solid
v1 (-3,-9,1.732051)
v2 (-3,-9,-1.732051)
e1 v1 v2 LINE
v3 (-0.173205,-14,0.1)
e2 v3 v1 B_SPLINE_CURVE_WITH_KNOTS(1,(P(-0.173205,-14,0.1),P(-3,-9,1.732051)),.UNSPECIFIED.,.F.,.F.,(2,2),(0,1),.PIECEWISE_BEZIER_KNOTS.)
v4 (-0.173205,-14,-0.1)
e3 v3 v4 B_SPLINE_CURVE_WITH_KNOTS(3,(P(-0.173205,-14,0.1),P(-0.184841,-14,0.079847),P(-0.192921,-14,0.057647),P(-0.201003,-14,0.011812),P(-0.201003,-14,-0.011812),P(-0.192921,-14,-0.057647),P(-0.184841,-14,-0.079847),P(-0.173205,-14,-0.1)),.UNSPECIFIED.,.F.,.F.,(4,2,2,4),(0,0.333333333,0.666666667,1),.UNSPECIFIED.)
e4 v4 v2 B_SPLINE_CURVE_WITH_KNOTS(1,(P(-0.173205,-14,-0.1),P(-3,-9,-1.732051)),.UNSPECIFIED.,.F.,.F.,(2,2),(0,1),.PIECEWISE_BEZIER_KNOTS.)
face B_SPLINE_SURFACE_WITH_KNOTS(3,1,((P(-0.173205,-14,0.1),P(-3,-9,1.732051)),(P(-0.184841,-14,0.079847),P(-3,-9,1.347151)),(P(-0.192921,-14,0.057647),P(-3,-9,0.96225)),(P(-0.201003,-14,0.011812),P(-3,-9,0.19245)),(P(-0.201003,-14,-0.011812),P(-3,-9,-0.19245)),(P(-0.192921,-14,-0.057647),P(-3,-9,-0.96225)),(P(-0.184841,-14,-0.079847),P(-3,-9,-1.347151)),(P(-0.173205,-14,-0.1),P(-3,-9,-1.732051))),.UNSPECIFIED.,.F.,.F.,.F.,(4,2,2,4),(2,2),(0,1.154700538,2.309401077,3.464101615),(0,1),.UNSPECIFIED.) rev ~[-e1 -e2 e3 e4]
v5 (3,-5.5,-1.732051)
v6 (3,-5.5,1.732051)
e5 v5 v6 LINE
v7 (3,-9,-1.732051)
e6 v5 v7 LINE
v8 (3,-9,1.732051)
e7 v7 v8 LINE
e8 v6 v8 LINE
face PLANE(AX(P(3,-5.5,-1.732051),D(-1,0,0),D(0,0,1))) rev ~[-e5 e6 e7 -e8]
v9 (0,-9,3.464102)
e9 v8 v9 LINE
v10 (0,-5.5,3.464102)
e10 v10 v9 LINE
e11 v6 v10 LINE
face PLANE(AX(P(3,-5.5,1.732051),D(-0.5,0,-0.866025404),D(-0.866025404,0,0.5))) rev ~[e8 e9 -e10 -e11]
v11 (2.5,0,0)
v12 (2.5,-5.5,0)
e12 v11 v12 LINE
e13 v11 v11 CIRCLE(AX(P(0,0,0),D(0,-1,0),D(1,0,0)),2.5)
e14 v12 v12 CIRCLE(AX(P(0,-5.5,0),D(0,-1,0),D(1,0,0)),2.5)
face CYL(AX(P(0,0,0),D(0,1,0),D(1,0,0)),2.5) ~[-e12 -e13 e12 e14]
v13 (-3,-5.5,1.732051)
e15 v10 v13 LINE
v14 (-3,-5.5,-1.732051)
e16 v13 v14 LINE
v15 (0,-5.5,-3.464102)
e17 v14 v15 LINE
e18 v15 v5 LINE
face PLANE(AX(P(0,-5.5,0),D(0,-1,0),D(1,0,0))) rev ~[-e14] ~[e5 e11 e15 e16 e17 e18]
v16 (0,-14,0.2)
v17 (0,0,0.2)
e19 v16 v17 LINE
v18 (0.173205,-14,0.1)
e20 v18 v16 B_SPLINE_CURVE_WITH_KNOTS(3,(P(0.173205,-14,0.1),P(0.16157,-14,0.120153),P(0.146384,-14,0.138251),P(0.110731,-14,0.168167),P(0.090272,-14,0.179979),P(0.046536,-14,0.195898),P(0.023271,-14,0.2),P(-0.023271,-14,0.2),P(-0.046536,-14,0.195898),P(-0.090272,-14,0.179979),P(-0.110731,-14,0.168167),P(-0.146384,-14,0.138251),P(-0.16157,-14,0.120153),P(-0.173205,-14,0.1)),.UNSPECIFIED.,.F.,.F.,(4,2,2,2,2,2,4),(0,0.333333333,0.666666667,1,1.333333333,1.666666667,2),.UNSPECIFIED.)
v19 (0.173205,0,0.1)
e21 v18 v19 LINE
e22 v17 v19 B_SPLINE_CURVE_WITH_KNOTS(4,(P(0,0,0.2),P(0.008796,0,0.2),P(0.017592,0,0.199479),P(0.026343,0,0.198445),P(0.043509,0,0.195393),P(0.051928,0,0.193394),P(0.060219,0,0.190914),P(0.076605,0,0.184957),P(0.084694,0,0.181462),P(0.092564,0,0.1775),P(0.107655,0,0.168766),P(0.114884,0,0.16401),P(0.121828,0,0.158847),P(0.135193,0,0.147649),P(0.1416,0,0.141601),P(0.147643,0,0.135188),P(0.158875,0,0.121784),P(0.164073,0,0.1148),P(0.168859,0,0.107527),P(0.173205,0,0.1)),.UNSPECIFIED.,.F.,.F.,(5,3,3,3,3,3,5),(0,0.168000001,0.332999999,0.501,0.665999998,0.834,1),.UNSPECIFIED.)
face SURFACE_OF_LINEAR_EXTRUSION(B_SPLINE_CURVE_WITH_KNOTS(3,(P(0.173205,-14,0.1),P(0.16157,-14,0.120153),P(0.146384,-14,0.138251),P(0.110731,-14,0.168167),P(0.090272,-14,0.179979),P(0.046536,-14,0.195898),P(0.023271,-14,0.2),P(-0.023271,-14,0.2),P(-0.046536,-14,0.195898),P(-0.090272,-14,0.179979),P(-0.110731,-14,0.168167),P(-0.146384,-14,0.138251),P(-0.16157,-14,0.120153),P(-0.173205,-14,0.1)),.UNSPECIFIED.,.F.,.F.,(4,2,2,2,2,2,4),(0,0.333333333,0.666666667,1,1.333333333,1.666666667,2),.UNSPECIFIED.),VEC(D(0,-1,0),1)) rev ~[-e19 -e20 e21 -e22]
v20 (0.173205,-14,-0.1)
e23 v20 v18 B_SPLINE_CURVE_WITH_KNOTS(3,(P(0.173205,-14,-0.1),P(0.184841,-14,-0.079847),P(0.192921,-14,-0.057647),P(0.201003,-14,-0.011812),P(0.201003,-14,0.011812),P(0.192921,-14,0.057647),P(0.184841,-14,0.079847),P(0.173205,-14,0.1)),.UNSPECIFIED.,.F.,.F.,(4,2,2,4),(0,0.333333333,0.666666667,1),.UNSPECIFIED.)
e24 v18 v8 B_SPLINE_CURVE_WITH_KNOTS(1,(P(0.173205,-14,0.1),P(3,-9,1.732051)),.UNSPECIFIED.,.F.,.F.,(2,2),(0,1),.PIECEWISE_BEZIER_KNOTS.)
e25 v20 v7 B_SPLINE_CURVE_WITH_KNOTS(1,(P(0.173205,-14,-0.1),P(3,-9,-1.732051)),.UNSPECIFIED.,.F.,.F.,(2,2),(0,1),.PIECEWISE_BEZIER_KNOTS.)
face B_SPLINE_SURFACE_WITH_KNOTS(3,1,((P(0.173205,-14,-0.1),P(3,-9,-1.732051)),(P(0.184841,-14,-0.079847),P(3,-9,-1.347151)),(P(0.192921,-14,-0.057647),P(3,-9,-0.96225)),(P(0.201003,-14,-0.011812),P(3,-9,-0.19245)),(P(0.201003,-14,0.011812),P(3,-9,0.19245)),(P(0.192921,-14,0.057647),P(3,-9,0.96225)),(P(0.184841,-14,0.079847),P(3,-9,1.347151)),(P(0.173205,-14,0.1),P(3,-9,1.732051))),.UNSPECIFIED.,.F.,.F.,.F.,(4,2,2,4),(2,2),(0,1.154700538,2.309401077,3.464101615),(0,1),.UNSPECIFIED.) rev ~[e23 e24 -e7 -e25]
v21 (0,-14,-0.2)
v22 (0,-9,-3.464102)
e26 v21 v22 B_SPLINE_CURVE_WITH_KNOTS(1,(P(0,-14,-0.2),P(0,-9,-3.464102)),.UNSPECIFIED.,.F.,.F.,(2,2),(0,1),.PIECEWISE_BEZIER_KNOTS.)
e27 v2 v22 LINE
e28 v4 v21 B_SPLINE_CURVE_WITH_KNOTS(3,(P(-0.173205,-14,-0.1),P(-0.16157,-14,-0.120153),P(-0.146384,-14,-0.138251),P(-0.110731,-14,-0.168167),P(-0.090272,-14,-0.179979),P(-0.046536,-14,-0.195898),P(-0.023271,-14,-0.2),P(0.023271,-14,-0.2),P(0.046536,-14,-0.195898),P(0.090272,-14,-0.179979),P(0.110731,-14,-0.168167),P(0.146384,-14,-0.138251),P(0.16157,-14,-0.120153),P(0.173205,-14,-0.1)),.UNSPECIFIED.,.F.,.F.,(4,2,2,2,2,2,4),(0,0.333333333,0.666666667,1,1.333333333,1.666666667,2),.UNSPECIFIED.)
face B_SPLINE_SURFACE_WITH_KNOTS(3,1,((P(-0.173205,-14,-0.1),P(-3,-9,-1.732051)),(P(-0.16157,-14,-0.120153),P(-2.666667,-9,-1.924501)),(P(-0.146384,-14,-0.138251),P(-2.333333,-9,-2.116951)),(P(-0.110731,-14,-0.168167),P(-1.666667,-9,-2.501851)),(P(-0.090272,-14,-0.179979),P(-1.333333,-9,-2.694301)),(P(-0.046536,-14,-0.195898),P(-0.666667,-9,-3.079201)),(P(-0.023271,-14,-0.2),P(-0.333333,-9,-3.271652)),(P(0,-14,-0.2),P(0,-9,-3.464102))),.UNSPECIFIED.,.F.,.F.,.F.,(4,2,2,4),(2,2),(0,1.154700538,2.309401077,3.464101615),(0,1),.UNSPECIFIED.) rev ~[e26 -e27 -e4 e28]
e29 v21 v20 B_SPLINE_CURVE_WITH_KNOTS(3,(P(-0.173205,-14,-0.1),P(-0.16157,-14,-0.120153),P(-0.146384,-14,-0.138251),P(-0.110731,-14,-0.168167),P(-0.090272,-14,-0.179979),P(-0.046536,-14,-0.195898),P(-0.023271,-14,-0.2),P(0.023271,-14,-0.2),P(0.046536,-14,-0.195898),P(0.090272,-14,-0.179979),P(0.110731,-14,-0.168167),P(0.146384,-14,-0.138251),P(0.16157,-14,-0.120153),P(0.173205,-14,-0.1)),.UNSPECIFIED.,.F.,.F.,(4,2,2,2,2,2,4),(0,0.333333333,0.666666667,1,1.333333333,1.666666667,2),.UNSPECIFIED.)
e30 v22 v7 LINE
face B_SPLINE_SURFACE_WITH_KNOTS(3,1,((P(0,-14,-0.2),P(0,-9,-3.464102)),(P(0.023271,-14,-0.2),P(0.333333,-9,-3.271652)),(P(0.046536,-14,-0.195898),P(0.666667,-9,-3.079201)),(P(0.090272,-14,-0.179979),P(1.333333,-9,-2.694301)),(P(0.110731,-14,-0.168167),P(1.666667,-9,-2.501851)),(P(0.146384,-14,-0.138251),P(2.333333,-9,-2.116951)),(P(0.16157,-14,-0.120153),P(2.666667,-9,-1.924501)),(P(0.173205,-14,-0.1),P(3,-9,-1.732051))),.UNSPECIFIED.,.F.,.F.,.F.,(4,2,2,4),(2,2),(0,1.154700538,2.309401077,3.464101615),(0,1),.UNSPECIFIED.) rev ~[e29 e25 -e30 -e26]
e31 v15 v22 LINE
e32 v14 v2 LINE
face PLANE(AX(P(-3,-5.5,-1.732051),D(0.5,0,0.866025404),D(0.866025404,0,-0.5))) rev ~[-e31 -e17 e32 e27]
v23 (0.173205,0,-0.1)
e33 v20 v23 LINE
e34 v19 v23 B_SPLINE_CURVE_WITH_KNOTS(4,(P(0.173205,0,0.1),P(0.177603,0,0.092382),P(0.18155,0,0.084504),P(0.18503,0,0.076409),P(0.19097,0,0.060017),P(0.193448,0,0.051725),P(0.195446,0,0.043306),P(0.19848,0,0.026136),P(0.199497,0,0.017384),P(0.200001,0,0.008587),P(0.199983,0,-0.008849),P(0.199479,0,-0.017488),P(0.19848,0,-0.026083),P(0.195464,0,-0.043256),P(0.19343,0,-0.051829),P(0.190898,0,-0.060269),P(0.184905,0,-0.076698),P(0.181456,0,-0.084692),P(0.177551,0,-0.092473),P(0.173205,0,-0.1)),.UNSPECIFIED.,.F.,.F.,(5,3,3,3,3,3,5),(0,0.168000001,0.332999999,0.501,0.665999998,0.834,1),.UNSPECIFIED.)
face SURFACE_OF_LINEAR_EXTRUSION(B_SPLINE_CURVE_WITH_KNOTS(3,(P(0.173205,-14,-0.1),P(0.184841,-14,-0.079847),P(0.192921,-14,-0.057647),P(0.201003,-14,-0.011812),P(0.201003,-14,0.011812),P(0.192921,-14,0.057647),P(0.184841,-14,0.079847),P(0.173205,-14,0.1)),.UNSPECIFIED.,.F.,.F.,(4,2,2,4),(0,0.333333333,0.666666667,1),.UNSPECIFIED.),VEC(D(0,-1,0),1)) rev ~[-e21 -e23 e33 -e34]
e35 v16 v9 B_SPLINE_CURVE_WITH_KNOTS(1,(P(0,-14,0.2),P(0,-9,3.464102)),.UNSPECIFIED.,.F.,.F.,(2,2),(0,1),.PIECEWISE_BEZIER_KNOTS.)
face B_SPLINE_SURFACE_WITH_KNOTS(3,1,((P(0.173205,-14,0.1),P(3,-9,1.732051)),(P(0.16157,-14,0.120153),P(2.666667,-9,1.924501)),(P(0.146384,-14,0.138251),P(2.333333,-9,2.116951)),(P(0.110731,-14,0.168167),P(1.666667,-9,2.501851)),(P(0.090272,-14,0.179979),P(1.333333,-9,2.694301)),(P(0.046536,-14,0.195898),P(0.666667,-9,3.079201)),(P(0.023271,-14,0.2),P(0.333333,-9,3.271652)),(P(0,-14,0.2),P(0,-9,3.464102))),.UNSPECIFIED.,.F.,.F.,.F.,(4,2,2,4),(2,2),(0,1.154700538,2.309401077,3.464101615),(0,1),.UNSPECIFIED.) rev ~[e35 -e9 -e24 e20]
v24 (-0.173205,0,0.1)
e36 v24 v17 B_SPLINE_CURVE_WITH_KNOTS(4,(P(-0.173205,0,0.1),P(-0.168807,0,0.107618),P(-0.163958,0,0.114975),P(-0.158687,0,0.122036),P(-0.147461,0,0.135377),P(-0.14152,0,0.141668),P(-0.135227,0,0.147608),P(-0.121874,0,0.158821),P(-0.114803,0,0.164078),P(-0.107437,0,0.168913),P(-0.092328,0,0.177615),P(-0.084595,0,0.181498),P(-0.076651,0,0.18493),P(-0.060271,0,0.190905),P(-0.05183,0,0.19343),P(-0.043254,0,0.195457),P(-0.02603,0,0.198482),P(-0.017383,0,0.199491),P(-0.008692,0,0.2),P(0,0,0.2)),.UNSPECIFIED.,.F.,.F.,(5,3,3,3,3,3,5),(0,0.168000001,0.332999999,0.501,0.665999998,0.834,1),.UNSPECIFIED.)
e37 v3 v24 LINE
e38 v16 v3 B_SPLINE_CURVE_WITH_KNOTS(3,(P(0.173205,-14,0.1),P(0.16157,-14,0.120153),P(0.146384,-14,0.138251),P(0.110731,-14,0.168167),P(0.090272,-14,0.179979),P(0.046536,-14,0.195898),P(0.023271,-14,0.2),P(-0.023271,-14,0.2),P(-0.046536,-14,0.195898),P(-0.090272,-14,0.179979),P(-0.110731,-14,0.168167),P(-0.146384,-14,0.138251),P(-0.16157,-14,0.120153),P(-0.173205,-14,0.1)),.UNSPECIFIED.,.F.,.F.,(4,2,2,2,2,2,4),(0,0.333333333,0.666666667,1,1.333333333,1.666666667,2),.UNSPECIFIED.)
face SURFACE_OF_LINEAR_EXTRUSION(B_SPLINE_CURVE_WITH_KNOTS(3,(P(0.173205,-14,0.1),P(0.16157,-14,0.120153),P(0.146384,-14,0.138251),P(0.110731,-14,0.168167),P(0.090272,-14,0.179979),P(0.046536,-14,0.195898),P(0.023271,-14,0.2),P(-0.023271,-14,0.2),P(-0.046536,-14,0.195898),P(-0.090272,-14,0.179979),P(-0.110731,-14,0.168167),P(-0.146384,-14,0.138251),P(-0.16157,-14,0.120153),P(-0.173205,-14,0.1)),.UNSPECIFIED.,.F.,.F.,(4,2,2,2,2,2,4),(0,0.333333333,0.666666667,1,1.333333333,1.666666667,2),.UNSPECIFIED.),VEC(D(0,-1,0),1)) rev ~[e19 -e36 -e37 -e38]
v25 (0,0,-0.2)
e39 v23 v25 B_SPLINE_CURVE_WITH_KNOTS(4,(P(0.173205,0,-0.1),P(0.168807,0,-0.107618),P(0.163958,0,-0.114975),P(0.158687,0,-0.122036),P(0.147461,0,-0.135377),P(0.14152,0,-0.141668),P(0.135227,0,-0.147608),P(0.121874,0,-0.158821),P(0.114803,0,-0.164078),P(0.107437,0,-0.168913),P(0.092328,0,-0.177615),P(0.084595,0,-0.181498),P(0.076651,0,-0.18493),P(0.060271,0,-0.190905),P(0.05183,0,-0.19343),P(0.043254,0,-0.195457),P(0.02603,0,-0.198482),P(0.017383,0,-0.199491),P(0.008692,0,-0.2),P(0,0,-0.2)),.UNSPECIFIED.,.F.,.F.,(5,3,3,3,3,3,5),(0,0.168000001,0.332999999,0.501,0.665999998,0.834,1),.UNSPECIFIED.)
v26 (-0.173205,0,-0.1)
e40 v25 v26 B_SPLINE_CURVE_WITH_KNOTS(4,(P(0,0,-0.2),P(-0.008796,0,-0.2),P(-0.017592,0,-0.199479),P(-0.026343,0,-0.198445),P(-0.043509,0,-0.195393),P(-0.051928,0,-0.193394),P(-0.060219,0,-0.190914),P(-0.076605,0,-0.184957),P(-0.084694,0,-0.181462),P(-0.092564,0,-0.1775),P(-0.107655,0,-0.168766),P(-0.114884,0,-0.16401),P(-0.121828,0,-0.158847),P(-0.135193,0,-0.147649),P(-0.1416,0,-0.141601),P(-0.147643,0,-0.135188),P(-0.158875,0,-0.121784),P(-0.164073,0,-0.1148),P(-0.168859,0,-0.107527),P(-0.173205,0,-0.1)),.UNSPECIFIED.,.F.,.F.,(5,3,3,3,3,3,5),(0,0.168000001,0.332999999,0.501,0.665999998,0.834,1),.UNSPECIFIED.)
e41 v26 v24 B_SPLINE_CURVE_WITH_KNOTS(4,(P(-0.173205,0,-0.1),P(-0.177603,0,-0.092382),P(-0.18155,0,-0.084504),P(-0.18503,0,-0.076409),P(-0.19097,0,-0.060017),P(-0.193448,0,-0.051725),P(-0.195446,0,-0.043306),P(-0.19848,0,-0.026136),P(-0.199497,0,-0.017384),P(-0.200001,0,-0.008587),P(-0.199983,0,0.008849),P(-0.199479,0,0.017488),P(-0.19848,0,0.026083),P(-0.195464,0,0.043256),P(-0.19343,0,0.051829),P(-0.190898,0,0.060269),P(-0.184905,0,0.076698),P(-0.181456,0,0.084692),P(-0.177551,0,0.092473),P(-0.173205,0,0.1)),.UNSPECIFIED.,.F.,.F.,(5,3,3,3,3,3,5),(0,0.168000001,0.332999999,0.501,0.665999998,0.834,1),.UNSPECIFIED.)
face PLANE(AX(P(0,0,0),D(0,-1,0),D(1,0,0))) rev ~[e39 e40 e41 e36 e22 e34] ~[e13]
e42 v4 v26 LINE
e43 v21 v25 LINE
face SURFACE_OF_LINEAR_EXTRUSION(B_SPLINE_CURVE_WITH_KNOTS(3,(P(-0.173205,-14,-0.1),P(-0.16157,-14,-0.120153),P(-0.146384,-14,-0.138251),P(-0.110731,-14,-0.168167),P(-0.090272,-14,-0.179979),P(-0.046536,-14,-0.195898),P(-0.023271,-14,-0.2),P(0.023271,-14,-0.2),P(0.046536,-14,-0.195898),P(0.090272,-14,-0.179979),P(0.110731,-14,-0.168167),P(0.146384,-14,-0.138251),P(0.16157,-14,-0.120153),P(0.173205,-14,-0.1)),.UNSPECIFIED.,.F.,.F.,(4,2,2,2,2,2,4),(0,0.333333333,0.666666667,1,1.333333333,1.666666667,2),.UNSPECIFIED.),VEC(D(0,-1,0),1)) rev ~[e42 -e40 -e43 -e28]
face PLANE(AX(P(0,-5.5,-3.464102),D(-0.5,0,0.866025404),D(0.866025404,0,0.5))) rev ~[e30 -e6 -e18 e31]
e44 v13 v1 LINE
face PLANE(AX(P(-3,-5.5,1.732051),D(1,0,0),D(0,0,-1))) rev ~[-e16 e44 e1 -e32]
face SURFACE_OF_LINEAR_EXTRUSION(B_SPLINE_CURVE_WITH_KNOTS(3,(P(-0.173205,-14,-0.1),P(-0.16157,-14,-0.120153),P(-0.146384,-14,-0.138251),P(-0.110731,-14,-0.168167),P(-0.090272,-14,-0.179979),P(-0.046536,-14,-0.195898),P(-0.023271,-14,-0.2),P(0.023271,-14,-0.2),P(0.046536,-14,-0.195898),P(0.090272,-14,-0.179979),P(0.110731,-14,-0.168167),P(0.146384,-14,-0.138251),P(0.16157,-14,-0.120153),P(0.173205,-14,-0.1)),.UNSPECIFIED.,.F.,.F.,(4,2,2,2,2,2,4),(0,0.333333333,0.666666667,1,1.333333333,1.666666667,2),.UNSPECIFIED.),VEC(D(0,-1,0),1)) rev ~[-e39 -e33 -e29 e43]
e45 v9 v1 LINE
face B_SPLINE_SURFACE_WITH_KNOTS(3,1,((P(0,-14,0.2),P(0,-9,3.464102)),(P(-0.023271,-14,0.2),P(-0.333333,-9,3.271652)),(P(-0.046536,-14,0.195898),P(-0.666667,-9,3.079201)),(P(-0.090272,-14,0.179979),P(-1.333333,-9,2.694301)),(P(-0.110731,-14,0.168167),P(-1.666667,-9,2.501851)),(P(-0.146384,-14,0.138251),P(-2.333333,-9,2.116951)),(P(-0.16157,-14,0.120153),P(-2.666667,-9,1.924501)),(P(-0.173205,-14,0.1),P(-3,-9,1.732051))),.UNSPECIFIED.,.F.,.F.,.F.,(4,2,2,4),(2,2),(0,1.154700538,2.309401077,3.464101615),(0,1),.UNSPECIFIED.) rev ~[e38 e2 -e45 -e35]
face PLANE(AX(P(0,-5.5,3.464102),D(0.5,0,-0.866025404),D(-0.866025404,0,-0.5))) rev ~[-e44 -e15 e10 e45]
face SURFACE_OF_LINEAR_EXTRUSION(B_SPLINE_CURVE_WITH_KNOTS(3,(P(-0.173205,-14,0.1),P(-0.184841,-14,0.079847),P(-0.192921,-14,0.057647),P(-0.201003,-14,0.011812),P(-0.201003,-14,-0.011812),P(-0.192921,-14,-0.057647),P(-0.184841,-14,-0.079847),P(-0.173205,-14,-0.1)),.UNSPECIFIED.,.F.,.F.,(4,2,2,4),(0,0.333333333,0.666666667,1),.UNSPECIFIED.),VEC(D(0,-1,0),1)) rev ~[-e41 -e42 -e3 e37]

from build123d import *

# Parameters (mm, degrees)
F0_R     = 2.5
F1_DEPTH = 5.5
F2_R     = 2.5
F3_DEPTH = 3.5
F7_DEPTH = 25


# Not quite as in the source:
# - the arcs of a loft's sections are written as splines that run evenly, so that the points pair up as in the source's solid


with BuildPart() as f1:
    # F0 (on Front) → F1 (new body)
    with BuildSketch(Plane.XZ):
        Circle(F0_R)
    extrude(amount=F1_DEPTH)

    # F2 (on face) → F3 (join)
    with BuildSketch(Plane.XZ.offset(5.5)):
        Polygon((3, -1.7320508076), (3, 1.7320508076), (0, 3.4641016151), (-3, 1.7320508076), (-3, -1.7320508076), (0, -3.4641016151), align=None)
        Circle(F2_R, mode=Mode.SUBTRACT)
        Circle(F2_R)
    extrude(amount=F3_DEPTH)

    # F5 (on offset) → F6 section 0
    with BuildSketch(Plane.XZ.offset(14)):
        with BuildLine():
            add(Edge.make_bspline(
                [(0.1732050808, -0.1), (0.1848406091, -0.0798466737), (0.192920574, -0.0576471526), (0.2010025272, -0.0118121185), (0.2010025272, 0.0118121185), (0.192920574, 0.0576471526), (0.1848406091, 0.0798466737), (0.1732050808, 0.1)],
                knots=[0, 0, 0, 0, 0.3333333333, 0.3333333333, 0.6666666667, 0.6666666667, 1, 1, 1, 1], degree=3))
            add(Edge.make_bspline(
                [(0.1732050808, 0.1), (0.1615695524, 0.1201533263), (0.1463841856, 0.1382505417), (0.1107308583, 0.1681672355), (0.0902716689, 0.179979354), (0.0465363884, 0.1958976943), (0.0232710567, 0.2), (0, 0.2)],
                knots=[0, 0, 0, 0, 0.3333333333, 0.3333333333, 0.6666666667, 0.6666666667, 1, 1, 1, 1], degree=3))
            add(Edge.make_bspline(
                [(0, 0.2), (-0.0232710567, 0.2), (-0.0465363884, 0.1958976943), (-0.0902716689, 0.179979354), (-0.1107308583, 0.1681672355), (-0.1463841856, 0.1382505417), (-0.1615695524, 0.1201533263), (-0.1732050808, 0.1)],
                knots=[0, 0, 0, 0, 0.3333333333, 0.3333333333, 0.6666666667, 0.6666666667, 1, 1, 1, 1], degree=3))
            add(Edge.make_bspline(
                [(-0.1732050808, 0.1), (-0.1848406091, 0.0798466737), (-0.192920574, 0.0576471526), (-0.2010025272, 0.0118121185), (-0.2010025272, -0.0118121185), (-0.192920574, -0.0576471526), (-0.1848406091, -0.0798466737), (-0.1732050808, -0.1)],
                knots=[0, 0, 0, 0, 0.3333333333, 0.3333333333, 0.6666666667, 0.6666666667, 1, 1, 1, 1], degree=3))
            add(Edge.make_bspline(
                [(-0.1732050808, -0.1), (-0.1615695524, -0.1201533263), (-0.1463841856, -0.1382505417), (-0.1107308583, -0.1681672355), (-0.0902716689, -0.179979354), (-0.0465363884, -0.1958976943), (-0.0232710567, -0.2), (0, -0.2)],
                knots=[0, 0, 0, 0, 0.3333333333, 0.3333333333, 0.6666666667, 0.6666666667, 1, 1, 1, 1], degree=3))
            add(Edge.make_bspline(
                [(0, -0.2), (0.0232710567, -0.2), (0.0465363884, -0.1958976943), (0.0902716689, -0.179979354), (0.1107308583, -0.1681672355), (0.1463841856, -0.1382505417), (0.1615695524, -0.1201533263), (0.1732050808, -0.1)],
                knots=[0, 0, 0, 0, 0.3333333333, 0.3333333333, 0.6666666667, 0.6666666667, 1, 1, 1, 1], degree=3))
        make_face()
    # F3_face (on face) → F6 section 1
    with BuildSketch(Plane.XZ.offset(9)):
        Polygon((3, -1.7320508076), (3, 1.7320508076), (0, 3.4641016151), (-3, 1.7320508076), (-3, -1.7320508076), (0, -3.4641016151), align=None)
    loft(ruled=True)

    # F7 (cut): a face of the model
    f7_faces = [f1.faces().sort_by_distance(p)[0] for p in [
        (0, -14, 0),
    ]]
    extrude(f7_faces, amount=-F7_DEPTH, mode=Mode.SUBTRACT)


solid = f1.part
